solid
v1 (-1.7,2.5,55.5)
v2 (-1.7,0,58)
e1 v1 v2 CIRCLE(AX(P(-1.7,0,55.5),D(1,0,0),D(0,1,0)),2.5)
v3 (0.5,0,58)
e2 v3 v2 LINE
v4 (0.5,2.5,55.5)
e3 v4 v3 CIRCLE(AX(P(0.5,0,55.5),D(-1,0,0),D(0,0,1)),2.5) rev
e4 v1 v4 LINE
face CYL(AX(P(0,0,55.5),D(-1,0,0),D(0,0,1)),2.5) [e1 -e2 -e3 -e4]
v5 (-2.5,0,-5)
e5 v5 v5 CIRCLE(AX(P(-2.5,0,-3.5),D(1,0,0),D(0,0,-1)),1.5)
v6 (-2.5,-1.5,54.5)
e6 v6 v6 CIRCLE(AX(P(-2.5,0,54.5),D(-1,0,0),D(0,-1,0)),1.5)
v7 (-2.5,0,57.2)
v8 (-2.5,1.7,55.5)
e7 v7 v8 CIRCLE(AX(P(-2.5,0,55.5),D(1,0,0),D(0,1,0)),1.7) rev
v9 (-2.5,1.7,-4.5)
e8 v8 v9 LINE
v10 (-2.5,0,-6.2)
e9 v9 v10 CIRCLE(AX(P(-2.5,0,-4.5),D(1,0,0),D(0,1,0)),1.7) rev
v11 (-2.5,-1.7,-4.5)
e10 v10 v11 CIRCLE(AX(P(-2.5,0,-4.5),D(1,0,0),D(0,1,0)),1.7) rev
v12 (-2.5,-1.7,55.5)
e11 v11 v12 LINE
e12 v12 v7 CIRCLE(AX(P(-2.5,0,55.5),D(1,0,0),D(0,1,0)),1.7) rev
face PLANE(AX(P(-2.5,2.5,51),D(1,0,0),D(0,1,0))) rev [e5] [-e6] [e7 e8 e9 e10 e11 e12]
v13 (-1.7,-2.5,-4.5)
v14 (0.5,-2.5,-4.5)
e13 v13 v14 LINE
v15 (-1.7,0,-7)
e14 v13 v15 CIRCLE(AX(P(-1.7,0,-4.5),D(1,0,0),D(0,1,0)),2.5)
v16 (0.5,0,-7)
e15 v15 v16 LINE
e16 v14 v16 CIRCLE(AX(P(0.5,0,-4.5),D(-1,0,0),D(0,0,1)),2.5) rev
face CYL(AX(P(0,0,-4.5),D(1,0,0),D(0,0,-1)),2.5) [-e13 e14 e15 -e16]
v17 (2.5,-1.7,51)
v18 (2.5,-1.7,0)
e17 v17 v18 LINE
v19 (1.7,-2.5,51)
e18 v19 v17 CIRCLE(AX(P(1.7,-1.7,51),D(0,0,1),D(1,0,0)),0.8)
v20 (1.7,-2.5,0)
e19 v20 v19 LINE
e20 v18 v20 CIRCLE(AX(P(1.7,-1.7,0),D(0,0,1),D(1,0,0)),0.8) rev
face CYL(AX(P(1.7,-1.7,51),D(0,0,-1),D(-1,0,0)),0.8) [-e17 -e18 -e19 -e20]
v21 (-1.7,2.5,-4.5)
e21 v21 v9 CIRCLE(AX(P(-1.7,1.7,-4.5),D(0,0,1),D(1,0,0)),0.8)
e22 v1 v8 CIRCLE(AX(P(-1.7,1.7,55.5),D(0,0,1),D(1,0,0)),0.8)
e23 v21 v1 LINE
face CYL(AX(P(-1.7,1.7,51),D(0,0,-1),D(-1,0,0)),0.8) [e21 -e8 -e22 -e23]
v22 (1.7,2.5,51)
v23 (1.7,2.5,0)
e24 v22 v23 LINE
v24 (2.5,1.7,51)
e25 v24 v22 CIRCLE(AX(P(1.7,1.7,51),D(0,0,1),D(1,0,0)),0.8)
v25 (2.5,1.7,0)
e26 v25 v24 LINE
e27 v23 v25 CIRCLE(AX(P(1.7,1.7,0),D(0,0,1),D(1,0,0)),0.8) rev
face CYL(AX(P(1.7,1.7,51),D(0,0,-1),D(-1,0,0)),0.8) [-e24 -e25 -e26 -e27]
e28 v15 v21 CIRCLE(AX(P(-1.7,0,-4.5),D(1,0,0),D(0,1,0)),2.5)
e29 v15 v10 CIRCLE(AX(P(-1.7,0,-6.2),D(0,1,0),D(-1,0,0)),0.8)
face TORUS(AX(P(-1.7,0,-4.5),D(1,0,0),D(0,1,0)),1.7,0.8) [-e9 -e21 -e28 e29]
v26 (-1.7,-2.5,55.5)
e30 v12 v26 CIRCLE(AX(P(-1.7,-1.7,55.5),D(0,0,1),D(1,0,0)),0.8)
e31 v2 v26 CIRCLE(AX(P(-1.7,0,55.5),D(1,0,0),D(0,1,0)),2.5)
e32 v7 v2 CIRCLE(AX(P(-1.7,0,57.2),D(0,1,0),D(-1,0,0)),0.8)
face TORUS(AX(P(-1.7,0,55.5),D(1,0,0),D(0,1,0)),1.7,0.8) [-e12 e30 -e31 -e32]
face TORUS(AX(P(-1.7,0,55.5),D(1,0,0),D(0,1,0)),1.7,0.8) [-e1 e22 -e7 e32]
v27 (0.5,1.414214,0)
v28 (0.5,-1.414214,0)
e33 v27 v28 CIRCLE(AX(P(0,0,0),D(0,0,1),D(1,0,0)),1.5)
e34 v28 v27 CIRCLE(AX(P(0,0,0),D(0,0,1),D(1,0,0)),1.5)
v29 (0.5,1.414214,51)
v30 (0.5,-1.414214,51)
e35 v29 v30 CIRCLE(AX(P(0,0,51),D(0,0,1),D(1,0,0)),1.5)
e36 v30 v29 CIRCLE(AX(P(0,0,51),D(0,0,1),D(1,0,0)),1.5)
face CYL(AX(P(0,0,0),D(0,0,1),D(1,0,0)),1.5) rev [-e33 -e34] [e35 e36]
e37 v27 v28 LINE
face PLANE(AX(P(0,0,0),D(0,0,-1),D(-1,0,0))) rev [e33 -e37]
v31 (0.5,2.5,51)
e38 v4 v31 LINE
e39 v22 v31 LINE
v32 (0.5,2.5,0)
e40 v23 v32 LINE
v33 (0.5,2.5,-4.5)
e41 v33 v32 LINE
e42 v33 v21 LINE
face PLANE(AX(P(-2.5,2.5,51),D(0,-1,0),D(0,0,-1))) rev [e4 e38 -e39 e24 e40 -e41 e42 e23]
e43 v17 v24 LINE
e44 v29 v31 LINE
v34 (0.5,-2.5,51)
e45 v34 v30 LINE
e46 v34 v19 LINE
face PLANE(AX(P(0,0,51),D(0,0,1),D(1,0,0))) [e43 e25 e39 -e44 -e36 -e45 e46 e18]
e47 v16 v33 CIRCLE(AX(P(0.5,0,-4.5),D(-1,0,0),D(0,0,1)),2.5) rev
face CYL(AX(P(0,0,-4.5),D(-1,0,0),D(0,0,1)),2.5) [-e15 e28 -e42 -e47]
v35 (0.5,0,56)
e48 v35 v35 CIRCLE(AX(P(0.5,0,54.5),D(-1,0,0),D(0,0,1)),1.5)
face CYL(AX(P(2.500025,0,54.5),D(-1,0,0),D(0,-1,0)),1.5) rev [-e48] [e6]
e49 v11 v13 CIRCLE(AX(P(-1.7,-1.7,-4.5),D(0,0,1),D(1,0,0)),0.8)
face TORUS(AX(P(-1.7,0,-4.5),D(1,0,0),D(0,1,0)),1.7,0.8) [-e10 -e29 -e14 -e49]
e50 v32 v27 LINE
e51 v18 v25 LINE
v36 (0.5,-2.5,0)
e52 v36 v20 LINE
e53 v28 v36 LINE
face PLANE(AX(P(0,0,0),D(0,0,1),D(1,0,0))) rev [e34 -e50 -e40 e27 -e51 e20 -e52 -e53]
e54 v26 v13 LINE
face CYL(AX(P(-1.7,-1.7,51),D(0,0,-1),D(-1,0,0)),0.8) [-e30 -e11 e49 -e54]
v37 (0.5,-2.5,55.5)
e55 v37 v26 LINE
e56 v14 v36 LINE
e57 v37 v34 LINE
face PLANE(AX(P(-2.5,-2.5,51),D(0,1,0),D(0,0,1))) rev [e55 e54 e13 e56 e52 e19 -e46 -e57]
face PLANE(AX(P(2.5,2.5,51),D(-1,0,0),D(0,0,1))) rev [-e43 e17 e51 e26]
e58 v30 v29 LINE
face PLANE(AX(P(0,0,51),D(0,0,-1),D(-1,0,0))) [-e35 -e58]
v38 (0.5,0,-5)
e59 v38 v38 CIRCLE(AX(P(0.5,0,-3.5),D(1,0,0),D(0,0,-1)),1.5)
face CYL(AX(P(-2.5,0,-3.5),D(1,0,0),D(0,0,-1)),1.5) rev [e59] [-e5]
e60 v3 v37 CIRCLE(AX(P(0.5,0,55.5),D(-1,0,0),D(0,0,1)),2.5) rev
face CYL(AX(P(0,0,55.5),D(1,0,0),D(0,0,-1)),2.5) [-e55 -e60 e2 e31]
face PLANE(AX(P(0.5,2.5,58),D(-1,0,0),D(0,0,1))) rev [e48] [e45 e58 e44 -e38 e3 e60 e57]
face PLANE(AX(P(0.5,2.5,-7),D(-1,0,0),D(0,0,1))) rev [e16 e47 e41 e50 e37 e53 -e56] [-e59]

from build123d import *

# Parameters (mm, degrees)
SKETCH_1_W          = 5
SKETCH_1_H          = 5
EXTRUDE_1_DEPTH     = 51
SKETCH_2_R          = 1.5
CUT_EXTRUDE_1_DEPTH = 52.122402134
SKETCH_3_W          = 3
SKETCH_3_H          = 5
EXTRUDE_2_DEPTH     = 7
FILLET_1_R          = 2.5
SKETCH_4_R          = 1.5
CUT_EXTRUDE_2_DEPTH = 59.268773799
SKETCH_5_W          = 3
SKETCH_5_H          = 5
EXTRUDE_3_DEPTH     = 7
FILLET_2_R          = 2.5
SKETCH_6_R          = 1.5
CUT_EXTRUDE_3_DEPTH = 59.131316861
FILLET_3_R          = 0.8


with BuildPart() as part:
    # 草图1 → 凸台-拉伸1 (new body)
    with BuildSketch(Plane.XY):
        Rectangle(SKETCH_1_W, SKETCH_1_H)
    extrude(amount=EXTRUDE_1_DEPTH)

    # 草图2 → 切除-拉伸1 (cut, through all)
    with BuildSketch(Plane.XY.offset(51)):
        Circle(SKETCH_2_R)
    extrude(amount=-CUT_EXTRUDE_1_DEPTH, mode=Mode.SUBTRACT)

    # 草图3 → 凸台-拉伸2 (add)
    with BuildSketch(Plane.XY.offset(51)):
        with Locations((-1, 0)):
            Rectangle(SKETCH_3_W, SKETCH_3_H)
    extrude(amount=EXTRUDE_2_DEPTH)

    # 圆角1
    fillet_1_edges = [part.edges().sort_by_distance(p)[0] for p in [
        (-1, -2.5, 58),
        (-1, 2.5, 58),
    ]]
    fillet(fillet_1_edges, radius=FILLET_1_R - 0.0001)  # a hair under: the kernel refuses the full size

    # 草图4 → 切除-拉伸2 (cut, through all)
    with BuildSketch(Plane.ZY.offset(2.5)):
        with Locations(Location((54.5, 0, 0), (0, 0, 270))):
            Circle(SKETCH_4_R)
    extrude(amount=-CUT_EXTRUDE_2_DEPTH, mode=Mode.SUBTRACT)

    # 草图5 → 凸台-拉伸3 (add)
    with BuildSketch(Plane(origin=(0, 0, 0), x_dir=(-1, 0, 0), z_dir=(0, 0, -1))):
        with Locations((1, 0)):
            Rectangle(SKETCH_5_W, SKETCH_5_H)
    extrude(amount=EXTRUDE_3_DEPTH)

    # 圆角2
    fillet_2_edges = [part.edges().sort_by_distance(p)[0] for p in [
        (-1, -2.5, -7),
        (-1, 2.5, -7),
    ]]
    fillet(fillet_2_edges, radius=FILLET_2_R - 0.0001)  # a hair under: the kernel refuses the full size

    # 草图6 → 切除-拉伸3 (cut, through all)
    with BuildSketch(Plane(origin=(0.5, 0, 0), x_dir=(0, 0, -1), z_dir=(1, 0, 0))):
        with Locations((3.5, 0)):
            Circle(SKETCH_6_R)
    extrude(amount=-CUT_EXTRUDE_3_DEPTH, mode=Mode.SUBTRACT)

    # 圆角3
    fillet_3_edges = [part.edges().sort_by_distance(p)[0] for p in [
        (-2.5, 1.767796242, 57.267796242),
        (-2.5, -1.767796242, 57.267796242),
        (-2.5, -2.5, 25.5),
        (-2.5, -1.767796242, -6.267796242),
        (-2.5, 1.767796242, -6.267796242),
        (-2.5, 2.5, 25.5),
        (2.5, -2.5, 25.5),
        (2.5, 2.5, 25.5),
    ]]
    fillet(fillet_3_edges, radius=FILLET_3_R)


solid = part.part
